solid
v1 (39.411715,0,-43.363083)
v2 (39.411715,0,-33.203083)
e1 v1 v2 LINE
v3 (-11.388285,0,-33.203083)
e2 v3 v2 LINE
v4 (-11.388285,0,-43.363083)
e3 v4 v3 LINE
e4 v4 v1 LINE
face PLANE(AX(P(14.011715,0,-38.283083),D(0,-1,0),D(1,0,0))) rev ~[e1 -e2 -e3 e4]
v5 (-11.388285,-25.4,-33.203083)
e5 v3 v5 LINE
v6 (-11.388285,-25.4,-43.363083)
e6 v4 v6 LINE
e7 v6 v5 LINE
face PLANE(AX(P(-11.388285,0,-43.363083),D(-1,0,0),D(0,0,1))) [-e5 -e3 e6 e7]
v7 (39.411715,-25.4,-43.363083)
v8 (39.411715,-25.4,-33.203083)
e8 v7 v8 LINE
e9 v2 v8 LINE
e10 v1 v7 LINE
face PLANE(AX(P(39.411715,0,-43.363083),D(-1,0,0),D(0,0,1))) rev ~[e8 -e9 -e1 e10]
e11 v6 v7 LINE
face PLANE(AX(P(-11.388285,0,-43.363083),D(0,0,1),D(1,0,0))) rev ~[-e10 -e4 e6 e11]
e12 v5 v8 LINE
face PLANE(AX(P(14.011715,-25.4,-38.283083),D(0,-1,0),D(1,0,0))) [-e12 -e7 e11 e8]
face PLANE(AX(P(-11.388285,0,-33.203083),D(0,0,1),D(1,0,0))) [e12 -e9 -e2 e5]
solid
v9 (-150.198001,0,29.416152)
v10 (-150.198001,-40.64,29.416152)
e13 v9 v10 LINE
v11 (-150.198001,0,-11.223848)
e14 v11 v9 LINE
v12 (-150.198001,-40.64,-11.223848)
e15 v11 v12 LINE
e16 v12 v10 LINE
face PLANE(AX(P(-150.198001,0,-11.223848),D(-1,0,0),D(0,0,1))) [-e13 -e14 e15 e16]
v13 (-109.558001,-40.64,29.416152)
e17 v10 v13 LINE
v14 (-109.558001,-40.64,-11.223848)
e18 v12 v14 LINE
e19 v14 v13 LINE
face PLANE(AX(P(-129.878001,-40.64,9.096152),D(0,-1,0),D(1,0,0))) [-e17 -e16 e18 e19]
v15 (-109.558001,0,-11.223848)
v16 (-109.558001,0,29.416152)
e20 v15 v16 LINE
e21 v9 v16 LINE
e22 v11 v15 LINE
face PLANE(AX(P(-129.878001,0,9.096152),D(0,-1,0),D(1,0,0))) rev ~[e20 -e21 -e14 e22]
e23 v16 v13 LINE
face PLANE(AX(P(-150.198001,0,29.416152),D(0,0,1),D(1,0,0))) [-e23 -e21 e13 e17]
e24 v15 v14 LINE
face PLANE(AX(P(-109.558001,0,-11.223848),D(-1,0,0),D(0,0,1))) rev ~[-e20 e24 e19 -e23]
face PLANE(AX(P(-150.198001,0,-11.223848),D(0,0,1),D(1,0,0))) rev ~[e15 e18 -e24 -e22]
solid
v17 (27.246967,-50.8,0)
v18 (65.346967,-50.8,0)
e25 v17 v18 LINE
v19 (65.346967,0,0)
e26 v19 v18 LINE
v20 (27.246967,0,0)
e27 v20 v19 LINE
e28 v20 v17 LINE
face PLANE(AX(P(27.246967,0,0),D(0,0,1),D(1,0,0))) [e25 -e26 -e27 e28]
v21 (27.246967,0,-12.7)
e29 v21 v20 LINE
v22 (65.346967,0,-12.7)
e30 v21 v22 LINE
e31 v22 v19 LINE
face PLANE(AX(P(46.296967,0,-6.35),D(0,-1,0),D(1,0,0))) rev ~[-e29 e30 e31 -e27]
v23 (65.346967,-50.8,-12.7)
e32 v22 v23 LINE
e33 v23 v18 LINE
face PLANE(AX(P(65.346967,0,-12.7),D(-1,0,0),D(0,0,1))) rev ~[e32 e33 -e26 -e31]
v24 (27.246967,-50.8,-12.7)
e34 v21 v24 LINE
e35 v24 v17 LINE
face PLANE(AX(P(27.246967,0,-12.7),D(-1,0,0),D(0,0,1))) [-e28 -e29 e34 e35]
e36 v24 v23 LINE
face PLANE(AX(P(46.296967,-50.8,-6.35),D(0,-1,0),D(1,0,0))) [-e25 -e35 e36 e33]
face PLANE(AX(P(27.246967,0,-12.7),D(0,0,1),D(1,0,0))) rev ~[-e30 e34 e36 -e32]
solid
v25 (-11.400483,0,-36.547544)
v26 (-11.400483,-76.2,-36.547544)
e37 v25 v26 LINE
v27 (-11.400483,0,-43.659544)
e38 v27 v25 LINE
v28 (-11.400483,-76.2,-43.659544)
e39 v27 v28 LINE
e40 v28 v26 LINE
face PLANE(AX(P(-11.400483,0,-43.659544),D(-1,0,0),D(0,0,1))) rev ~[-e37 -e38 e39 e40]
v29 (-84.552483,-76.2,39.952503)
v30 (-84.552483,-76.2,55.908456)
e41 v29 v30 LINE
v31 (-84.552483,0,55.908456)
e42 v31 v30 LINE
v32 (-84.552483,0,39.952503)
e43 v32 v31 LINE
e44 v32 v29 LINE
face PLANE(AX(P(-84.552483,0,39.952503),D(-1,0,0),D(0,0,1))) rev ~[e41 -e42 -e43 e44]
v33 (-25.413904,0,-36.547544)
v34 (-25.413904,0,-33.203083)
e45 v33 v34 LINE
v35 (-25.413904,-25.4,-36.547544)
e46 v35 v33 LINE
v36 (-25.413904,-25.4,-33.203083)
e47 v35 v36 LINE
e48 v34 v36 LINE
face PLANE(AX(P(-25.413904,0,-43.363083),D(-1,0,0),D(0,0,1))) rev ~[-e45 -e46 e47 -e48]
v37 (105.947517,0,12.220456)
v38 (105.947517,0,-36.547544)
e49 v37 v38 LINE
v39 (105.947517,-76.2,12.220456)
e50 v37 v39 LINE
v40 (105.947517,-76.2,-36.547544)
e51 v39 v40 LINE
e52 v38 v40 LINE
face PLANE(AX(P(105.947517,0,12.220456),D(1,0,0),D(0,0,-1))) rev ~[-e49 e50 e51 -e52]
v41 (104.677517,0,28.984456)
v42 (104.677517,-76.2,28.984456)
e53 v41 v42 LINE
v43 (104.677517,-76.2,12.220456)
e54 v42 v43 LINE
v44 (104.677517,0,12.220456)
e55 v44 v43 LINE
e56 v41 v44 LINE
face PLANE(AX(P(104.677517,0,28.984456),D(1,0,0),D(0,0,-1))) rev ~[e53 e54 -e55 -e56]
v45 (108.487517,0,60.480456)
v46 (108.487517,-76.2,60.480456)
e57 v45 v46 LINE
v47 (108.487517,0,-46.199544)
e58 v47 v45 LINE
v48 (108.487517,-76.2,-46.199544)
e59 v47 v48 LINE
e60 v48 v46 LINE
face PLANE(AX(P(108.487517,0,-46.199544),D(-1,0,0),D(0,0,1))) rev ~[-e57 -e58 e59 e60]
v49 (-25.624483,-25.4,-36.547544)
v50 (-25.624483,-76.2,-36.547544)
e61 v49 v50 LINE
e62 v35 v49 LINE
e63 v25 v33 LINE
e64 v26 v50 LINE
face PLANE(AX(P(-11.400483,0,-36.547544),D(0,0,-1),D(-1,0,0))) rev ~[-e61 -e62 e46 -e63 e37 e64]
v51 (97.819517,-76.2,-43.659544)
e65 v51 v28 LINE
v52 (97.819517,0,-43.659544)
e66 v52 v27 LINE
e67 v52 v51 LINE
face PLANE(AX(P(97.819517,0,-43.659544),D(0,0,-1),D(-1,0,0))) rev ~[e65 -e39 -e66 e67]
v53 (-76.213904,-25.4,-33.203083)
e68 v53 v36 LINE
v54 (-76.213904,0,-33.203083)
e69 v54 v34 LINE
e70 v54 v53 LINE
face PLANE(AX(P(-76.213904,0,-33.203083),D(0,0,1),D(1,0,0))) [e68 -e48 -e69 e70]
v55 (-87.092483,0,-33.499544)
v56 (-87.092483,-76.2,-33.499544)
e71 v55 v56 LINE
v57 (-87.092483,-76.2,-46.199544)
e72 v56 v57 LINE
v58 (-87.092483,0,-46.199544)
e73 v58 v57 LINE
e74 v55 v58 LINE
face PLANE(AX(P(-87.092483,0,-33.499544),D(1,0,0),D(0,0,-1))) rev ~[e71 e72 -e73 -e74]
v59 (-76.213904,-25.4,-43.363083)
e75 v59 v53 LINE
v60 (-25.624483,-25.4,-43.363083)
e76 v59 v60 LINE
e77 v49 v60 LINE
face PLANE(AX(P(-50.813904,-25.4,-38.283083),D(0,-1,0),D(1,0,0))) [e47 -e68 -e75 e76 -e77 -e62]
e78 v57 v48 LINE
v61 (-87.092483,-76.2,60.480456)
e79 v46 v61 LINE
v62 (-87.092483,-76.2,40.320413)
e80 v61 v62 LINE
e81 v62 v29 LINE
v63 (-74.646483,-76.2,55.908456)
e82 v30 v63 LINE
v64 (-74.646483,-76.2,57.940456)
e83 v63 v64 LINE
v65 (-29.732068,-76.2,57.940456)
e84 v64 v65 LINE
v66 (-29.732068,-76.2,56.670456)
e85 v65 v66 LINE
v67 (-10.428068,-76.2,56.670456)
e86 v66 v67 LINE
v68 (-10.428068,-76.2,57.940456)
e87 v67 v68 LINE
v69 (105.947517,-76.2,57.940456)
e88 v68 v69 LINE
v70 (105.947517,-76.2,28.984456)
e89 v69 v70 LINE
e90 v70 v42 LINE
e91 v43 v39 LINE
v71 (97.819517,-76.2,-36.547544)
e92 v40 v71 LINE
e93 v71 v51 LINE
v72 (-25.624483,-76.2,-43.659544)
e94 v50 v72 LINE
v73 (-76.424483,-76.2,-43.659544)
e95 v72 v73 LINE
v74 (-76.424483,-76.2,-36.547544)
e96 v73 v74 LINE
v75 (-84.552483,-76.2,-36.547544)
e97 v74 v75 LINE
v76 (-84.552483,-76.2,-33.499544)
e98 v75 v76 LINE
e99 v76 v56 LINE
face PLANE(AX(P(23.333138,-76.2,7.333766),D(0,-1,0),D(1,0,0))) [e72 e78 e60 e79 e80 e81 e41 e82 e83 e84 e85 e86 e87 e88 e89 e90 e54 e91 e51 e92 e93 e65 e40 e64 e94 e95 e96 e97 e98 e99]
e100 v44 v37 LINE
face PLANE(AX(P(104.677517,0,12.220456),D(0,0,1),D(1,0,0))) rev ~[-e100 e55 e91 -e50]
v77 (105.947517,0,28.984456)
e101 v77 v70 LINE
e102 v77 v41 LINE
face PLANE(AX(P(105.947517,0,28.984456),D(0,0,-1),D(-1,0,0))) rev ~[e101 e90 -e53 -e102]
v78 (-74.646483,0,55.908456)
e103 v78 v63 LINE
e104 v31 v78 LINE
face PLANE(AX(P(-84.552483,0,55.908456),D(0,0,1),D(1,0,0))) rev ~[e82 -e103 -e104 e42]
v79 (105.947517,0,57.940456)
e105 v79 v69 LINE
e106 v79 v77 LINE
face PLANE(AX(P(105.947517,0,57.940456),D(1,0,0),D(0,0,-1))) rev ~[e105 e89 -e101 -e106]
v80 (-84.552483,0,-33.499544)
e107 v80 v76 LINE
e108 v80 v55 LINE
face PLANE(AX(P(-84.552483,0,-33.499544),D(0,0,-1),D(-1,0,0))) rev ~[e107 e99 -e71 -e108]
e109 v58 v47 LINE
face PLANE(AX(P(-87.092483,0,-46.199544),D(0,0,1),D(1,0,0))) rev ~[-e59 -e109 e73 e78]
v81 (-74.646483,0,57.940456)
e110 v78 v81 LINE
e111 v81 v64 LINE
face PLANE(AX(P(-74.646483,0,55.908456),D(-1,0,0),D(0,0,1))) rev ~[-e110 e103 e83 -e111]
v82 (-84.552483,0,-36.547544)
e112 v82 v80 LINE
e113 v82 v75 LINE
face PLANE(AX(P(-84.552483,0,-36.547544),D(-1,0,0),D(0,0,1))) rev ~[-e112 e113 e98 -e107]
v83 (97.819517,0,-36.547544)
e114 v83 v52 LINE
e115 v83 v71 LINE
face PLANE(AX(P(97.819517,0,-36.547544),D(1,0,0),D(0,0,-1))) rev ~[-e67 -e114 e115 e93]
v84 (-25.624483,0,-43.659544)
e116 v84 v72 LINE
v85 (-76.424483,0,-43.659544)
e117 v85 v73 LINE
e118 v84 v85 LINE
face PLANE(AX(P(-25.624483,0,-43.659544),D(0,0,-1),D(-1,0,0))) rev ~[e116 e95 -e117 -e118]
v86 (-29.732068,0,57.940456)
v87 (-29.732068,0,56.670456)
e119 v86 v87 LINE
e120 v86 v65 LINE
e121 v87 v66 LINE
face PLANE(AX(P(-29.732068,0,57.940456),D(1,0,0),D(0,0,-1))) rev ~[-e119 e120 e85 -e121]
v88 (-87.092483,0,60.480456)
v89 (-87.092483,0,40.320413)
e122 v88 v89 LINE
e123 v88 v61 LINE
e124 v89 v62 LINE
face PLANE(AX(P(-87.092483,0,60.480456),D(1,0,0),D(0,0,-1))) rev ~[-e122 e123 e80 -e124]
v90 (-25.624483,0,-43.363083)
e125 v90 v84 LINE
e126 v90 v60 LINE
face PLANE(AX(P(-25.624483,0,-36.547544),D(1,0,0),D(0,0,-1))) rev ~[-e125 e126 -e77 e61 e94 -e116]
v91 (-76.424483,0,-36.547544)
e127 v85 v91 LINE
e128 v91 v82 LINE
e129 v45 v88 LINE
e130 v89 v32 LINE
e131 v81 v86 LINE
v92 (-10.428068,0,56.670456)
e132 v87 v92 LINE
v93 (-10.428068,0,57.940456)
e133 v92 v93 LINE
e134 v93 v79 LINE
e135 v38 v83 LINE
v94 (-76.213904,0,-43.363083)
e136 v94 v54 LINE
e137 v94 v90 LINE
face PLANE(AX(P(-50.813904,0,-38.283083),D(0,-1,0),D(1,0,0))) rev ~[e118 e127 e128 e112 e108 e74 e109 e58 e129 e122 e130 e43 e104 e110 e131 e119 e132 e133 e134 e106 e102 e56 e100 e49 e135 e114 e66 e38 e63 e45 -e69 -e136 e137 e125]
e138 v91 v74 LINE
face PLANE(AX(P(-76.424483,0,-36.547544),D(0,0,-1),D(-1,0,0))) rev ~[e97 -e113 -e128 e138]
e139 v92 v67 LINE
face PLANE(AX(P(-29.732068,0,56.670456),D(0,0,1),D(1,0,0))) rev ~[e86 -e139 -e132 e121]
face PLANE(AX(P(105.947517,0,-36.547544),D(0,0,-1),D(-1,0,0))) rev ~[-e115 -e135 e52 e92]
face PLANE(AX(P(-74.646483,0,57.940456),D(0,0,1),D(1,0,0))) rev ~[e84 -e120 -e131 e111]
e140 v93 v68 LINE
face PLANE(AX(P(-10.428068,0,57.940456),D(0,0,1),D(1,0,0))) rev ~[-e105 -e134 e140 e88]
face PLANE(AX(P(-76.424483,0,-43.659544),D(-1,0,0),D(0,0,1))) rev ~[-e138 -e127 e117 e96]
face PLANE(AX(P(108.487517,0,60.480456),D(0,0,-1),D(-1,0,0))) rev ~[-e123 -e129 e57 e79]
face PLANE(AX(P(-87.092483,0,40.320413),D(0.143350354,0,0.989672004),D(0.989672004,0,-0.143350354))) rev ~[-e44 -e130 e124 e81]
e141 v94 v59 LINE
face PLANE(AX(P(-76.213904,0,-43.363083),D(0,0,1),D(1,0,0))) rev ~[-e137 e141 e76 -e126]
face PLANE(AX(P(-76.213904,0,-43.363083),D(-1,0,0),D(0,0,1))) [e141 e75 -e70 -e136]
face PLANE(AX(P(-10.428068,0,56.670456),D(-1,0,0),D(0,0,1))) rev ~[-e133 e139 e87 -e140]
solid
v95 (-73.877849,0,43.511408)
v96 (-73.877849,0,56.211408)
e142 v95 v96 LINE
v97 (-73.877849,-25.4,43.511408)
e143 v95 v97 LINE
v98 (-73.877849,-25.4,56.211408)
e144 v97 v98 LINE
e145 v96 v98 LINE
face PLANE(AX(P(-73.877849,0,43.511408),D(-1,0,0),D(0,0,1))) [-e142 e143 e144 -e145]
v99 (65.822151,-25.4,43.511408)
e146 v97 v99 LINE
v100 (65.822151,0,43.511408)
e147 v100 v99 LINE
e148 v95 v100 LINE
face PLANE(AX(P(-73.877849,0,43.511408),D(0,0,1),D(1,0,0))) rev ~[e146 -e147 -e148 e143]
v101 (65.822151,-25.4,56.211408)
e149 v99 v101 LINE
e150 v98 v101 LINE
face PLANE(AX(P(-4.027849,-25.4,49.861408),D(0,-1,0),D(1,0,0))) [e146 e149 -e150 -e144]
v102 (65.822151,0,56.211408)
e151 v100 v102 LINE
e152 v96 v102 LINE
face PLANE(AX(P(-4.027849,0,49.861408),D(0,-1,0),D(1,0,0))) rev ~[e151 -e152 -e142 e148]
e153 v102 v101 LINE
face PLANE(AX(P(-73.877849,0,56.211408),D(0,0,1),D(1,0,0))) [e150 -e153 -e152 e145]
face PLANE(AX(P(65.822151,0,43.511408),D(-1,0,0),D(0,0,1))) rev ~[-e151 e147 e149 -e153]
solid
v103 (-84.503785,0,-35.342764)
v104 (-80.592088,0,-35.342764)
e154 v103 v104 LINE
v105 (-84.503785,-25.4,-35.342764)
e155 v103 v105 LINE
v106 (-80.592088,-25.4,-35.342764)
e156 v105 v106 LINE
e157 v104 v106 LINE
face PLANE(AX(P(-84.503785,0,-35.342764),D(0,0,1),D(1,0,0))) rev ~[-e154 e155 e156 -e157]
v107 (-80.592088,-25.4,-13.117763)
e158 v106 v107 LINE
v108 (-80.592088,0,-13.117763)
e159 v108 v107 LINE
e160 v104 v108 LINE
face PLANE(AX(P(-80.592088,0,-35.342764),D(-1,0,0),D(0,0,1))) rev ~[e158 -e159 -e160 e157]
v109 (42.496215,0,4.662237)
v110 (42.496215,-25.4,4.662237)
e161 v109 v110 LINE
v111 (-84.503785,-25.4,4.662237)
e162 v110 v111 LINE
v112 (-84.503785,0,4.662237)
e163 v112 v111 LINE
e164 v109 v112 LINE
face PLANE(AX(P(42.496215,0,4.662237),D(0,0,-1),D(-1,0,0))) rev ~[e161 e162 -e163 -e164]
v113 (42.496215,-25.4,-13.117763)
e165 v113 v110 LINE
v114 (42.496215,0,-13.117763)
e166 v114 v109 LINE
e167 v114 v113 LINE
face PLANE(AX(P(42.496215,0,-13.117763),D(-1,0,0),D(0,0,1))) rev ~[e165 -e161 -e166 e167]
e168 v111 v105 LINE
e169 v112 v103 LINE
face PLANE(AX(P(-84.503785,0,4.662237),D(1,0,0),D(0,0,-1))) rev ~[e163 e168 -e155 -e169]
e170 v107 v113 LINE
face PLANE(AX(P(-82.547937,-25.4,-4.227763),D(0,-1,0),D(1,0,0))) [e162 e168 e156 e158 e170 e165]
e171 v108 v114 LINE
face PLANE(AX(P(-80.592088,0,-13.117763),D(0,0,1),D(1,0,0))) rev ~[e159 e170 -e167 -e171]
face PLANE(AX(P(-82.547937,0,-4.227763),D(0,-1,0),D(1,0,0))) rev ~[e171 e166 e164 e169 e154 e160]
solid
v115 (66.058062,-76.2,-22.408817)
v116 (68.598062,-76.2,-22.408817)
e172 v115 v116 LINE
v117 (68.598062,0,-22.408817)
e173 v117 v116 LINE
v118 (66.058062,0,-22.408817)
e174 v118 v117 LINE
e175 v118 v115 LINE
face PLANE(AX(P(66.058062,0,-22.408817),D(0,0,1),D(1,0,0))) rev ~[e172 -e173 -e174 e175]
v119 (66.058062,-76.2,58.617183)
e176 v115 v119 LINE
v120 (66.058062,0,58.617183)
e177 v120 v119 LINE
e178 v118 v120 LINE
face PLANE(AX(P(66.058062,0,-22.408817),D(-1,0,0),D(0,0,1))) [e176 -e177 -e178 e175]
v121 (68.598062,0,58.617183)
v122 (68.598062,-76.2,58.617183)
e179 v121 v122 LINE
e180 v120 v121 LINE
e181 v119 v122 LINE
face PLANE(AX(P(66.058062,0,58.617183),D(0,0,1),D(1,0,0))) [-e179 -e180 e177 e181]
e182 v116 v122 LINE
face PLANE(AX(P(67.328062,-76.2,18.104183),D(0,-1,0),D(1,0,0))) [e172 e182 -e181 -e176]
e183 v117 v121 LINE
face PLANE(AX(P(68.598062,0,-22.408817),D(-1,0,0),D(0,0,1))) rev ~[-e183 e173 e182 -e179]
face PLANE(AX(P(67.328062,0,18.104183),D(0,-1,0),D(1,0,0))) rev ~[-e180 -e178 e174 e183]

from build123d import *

# Parameters (mm, degrees)
F6_DEPTH  = 76.2
F5_W      = 2.54
F5_H      = 81.026
F1_W      = 139.7
F1_H      = 12.7
F7_DEPTH  = 25.4
F3_W      = 50.8
F3_H      = 10.16
F4_W      = 3.9116963744
F4_H      = 17.78
F4_W_2    = 123.0883036256
F4_H_2    = 22.2250012395
F2_W      = 38.1
F2_H      = 12.7
F8_DEPTH  = 50.8
F9_W      = 40.64
F9_H      = 40.64
F10_DEPTH = 40.64


with BuildPart() as f6:
    # F0 (on Front) → F6 (new body)
    with BuildSketch(Plane.XZ):
        Polygon((-74.6464829862, 55.9084560133), (-74.6464829862, 57.9404560133), (-29.7320684276, 57.9404560133), (-29.7320684276, 56.6704560133), (-10.4280684276, 56.6704560133), (-10.4280684276, 57.9404560133), (105.9475170138, 57.9404560133), (105.9475170138, 28.9844560133), (104.6775170138, 28.9844560133), (104.6775170138, 12.2204560133), (105.9475170138, 12.2204560133), (105.9475170138, -36.5475439867), (97.8195170138, -36.5475439867), (97.8195170138, -43.6595439867), (-11.4004829862, -43.6595439867), (-11.4004829862, -36.5475439867), (-25.6244829862, -36.5475439867), (-25.6244829862, -43.6595439867), (-76.4244829862, -43.6595439867), (-76.4244829862, -36.5475439867), (-84.5524829862, -36.5475439867), (-84.5524829862, -33.4995439867), (-87.0924829862, -33.4995439867), (-87.0924829862, -46.1995439867), (108.4875170138, -46.1995439867), (108.4875170138, -43.6595439867), (108.4875170138, 60.4804560133), (-87.0924829862, 60.4804560133), (-87.0924829862, 40.320412819), (-84.5524829862, 39.9525031491), (-84.5524829862, 55.9084560133), align=None)
    extrude(amount=F6_DEPTH)

    # F3 (on face) → F7, piece 2 (join)
    with BuildSketch(Plane.XZ):
        with Locations((-50.8139037251, -38.283083154)):
            Rectangle(F3_W, F3_H)
    extrude(amount=F7_DEPTH)


with BuildPart() as f6b:
    # F5 (on Front) → F6, piece 2 (new body)
    with BuildSketch(Plane.XZ):
        with Locations((67.3280618, 18.1041830366)):
            Rectangle(F5_W, F5_H)
    extrude(amount=F6_DEPTH)


with BuildPart() as f7:
    # F1 (on Front) → F7 (new body)
    with BuildSketch(Plane.XZ):
        with Locations((-4.0278486848, 49.8614082277)):
            Rectangle(F1_W, F1_H)
    extrude(amount=F7_DEPTH)


with BuildPart() as f7b:
    # F3 (on face) → F7, piece 3 (new body)
    with BuildSketch(Plane.XZ):
        with Locations((14.0117149144, -38.283083154)):
            Rectangle(F3_W, F3_H)
    extrude(amount=F7_DEPTH)


with BuildPart() as f7c:
    # F4 (on Front) → F7, piece 4 (new body)
    with BuildSketch(Plane.XZ):
        with Locations((-82.5479365885, -4.2277628699)):
            Rectangle(F4_W, F4_H)
        with Locations((-19.0479365885, -4.2277628699)):
            Rectangle(F4_W_2, F4_H)
        with Locations((-82.5479365885, -24.2302634896)):
            Rectangle(F4_W, F4_H_2)
    extrude(amount=F7_DEPTH)


with BuildPart() as f8:
    # F2 (on Front) → F8 (new body)
    with BuildSketch(Plane.XZ):
        with Locations((46.296966958, -6.35)):
            Rectangle(F2_W, F2_H)
    extrude(amount=F8_DEPTH)


with BuildPart() as f10:
    # F9 (on Front) → F10 (new body)
    with BuildSketch(Plane.XZ):
        with Locations((-129.8780011606, 9.0961520222)):
            Rectangle(F9_W, F9_H)
    extrude(amount=F10_DEPTH)


solid = Compound([f6.part, f6b.part, f7.part, f7b.part, f7c.part, f8.part, f10.part])
